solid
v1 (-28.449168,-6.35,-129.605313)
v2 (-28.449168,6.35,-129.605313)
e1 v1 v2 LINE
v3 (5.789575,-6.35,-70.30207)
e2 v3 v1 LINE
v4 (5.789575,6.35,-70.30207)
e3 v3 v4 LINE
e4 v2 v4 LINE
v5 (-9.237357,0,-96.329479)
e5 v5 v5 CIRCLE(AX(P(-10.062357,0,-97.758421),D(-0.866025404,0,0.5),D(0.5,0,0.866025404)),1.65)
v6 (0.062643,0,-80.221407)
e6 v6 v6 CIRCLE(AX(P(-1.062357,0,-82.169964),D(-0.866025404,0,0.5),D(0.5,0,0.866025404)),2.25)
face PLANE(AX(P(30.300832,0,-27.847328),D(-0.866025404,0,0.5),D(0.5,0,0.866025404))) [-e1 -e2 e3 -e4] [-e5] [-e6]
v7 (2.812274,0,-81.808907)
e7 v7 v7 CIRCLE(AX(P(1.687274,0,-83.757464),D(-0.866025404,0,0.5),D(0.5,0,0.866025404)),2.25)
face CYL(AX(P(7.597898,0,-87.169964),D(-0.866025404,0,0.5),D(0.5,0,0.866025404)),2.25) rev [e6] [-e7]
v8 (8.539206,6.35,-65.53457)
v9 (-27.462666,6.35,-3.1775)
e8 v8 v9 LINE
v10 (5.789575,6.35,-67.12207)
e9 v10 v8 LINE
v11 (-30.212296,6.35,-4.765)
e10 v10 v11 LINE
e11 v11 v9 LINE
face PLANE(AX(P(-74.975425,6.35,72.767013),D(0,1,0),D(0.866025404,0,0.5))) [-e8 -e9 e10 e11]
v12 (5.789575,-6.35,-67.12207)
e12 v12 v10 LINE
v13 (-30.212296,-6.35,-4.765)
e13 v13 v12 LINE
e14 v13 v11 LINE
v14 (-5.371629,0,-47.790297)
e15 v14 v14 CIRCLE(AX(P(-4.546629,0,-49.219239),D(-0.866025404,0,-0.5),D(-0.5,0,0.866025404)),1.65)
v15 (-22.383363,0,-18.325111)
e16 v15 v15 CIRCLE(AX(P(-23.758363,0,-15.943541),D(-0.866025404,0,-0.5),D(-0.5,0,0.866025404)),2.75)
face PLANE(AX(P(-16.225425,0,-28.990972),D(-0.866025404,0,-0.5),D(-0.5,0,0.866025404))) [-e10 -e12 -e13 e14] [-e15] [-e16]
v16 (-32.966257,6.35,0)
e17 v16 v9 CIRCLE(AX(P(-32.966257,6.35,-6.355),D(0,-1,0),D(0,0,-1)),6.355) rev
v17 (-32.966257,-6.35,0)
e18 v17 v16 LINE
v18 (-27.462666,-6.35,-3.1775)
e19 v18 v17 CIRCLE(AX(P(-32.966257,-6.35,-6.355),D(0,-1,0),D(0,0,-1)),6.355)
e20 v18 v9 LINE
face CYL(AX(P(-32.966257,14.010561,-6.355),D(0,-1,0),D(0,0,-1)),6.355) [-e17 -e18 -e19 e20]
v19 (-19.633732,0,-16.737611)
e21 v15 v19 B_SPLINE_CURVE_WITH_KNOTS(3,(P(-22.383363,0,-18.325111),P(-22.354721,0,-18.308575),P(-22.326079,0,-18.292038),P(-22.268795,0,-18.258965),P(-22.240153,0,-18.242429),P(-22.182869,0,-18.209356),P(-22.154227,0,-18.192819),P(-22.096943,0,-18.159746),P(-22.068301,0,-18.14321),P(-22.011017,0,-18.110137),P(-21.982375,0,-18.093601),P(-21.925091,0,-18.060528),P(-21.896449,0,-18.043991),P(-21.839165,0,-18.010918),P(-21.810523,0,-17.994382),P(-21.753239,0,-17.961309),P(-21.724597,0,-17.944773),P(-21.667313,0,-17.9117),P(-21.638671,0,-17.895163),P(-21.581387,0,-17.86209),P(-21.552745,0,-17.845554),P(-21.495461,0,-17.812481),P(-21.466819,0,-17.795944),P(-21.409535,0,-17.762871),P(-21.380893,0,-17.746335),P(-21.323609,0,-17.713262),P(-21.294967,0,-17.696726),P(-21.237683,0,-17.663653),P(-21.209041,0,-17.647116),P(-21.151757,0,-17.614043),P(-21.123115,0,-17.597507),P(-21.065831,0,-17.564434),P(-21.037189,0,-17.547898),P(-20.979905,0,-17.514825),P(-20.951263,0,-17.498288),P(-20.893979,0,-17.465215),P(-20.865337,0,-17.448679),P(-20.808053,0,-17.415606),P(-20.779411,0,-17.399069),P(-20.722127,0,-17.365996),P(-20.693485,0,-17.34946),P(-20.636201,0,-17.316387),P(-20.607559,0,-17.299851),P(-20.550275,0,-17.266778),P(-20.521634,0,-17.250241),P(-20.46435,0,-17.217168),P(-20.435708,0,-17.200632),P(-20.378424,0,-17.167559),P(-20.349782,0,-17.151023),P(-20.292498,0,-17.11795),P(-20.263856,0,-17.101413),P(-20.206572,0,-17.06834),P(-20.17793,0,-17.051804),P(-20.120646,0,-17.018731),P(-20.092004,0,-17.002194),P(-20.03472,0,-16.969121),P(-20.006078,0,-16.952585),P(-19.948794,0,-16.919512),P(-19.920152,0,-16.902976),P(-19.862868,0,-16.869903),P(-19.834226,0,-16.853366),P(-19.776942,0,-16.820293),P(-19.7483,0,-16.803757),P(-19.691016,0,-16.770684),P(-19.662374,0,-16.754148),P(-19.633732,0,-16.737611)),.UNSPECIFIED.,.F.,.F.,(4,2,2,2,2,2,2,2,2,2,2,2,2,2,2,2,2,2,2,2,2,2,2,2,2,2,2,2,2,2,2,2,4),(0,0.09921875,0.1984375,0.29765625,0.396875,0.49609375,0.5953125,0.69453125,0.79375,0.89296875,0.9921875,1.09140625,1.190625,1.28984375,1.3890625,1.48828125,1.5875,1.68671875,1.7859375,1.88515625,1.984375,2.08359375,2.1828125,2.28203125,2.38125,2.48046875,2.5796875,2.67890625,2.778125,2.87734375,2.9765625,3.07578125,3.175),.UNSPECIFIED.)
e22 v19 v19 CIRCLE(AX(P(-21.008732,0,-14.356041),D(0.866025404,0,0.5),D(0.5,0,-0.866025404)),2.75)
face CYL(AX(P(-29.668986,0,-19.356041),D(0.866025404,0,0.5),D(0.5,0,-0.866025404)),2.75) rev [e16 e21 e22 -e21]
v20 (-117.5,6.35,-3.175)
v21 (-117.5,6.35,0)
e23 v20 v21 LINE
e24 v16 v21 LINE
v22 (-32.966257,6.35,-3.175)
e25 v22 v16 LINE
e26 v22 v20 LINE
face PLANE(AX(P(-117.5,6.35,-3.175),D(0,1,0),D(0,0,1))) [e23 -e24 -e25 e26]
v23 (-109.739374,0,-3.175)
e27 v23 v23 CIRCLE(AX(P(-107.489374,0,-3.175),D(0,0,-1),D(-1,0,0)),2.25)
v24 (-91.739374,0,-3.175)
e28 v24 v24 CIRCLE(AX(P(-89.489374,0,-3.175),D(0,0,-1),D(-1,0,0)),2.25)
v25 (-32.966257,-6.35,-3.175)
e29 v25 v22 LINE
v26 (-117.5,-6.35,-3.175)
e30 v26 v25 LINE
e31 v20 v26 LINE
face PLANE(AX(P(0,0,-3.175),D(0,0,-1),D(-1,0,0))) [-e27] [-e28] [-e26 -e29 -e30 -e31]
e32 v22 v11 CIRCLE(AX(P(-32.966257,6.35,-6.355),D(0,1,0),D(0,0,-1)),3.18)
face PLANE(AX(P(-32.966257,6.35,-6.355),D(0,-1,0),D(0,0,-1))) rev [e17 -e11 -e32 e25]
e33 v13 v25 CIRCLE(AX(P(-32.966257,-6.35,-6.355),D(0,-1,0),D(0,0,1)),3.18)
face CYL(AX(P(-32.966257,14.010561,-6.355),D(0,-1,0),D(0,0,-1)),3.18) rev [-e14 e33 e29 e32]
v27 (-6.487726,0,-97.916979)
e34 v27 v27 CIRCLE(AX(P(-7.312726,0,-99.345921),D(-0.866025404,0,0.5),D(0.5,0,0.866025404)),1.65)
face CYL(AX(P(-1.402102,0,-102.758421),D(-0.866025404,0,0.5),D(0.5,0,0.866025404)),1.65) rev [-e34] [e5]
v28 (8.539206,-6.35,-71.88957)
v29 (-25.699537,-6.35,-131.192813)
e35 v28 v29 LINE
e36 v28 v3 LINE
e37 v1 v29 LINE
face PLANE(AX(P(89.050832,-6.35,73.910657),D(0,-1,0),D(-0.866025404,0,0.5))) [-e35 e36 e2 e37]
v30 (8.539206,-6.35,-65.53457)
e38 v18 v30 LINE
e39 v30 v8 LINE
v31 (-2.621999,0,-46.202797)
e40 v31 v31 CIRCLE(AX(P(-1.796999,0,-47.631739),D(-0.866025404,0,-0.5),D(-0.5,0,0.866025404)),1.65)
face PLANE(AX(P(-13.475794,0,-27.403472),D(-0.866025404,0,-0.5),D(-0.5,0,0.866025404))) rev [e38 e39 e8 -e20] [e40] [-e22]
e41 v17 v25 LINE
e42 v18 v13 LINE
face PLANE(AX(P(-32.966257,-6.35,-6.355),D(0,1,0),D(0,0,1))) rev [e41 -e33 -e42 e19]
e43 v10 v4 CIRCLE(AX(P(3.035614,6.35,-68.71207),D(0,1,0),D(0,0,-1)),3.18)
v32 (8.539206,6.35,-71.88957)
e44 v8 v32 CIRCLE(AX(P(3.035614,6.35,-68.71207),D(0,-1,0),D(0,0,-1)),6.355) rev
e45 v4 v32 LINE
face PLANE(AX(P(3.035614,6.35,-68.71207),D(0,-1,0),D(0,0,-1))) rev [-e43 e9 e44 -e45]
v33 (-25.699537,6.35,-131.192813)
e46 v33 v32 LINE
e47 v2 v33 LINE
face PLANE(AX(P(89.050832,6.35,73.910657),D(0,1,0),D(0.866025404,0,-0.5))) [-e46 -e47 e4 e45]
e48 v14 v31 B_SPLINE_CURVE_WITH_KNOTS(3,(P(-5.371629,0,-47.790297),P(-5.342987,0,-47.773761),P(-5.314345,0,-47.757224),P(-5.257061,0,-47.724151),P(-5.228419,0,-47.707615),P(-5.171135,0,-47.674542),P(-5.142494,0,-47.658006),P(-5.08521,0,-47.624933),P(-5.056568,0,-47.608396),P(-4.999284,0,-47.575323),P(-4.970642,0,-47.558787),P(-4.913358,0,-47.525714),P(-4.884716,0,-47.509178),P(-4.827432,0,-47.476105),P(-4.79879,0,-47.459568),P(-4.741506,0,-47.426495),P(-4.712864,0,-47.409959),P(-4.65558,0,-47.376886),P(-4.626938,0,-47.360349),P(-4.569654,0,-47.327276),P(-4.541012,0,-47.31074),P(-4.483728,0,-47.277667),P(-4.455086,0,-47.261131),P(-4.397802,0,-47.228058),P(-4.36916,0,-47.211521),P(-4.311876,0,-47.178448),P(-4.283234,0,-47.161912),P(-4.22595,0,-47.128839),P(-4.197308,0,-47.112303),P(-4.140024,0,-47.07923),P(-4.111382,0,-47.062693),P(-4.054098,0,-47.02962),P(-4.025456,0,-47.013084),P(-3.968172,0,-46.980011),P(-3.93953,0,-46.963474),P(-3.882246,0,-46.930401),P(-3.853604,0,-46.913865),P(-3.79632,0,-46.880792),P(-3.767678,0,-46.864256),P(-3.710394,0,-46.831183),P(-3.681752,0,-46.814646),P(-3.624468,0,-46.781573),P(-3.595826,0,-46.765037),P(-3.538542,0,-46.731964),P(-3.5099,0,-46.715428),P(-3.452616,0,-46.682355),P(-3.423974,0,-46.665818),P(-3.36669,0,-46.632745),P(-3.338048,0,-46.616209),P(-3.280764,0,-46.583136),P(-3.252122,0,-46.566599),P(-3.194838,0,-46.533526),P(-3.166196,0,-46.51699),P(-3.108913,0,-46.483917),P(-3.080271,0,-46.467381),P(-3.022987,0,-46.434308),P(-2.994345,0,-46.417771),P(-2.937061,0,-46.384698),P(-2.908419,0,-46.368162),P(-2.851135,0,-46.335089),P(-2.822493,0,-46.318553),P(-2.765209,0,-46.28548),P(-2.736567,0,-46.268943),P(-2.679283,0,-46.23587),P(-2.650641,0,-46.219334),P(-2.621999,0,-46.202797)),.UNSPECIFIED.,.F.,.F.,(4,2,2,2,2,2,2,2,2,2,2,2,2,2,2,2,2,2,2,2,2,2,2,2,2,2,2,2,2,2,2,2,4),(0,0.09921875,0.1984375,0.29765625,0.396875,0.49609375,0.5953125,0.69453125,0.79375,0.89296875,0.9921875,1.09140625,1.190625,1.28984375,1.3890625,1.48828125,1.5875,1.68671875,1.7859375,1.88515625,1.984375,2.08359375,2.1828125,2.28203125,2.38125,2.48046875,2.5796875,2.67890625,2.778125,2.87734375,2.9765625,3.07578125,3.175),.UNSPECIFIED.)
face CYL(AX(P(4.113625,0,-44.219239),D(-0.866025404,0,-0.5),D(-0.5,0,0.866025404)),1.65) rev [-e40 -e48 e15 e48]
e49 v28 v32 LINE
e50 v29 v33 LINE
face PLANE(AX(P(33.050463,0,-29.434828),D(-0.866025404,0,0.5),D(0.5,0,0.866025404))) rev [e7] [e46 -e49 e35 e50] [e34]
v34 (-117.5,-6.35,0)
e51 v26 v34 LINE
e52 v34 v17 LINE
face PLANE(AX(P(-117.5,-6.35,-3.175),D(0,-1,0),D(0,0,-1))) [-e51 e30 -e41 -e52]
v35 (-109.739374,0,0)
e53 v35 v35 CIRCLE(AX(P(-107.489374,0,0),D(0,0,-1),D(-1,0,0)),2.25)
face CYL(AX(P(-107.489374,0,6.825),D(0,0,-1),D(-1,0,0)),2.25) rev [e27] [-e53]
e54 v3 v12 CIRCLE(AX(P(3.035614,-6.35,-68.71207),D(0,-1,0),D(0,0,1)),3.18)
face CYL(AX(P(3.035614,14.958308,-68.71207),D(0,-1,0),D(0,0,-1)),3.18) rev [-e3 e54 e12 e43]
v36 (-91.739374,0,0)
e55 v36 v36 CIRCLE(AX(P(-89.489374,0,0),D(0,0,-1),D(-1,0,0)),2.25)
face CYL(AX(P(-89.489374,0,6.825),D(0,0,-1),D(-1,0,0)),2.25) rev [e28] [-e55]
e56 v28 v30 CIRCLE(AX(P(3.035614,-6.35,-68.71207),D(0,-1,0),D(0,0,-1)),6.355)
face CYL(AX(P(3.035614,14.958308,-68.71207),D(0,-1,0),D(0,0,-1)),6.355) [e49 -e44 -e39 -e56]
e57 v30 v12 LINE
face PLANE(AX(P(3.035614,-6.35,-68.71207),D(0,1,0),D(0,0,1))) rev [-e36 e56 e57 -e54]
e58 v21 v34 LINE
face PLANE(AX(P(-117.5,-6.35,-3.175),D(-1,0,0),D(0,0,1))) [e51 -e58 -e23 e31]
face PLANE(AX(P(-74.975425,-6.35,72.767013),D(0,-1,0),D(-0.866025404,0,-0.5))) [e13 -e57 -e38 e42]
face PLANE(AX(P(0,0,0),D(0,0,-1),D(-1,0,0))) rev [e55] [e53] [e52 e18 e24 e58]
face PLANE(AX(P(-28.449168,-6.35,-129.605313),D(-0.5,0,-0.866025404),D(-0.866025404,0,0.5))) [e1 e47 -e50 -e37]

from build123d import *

# Parameters (mm, degrees)
ESBO_O2_W               = 235
ESBO_O2_H               = 12.7
FLANGE_BASE1_DEPTH      = 3.175
DOBRA_START             = -6.35
DOBRA_ESBO_ADA1_DEPTH   = 12.7
DOBRA_ESBO_ADA1_2_DEPTH = 12.7
DOBRA_ESBO_ADA2_DEPTH   = 12.7
DOBRA_ESBO_ADA2_2_DEPTH = 12.7
ESBO_O11_R              = 2.250000001
CORTE_EXTRUS_O1_DEPTH   = 10
ESBO_O13_R              = 2.750000001
CORTE_EXTRUS_O3_DEPTH   = 10
ESBO_O16_R              = 2.25
CORTE_EXTRUS_O5_DEPTH   = 10
ESBO_O17_R              = 2.25
ESBO_O17_R_2            = 1.65
CORTE_EXTRUS_O6_DEPTH   = 10
ESBO_O18_R              = 1.650000002
CORTE_EXTRUS_O7_DEPTH   = 10


# Read off the part's stored shape, not the designer's step: Dobra esboçada1, Dobra esboçada2
# Sheet-metal steps are written as plain solids
with BuildPart() as part:
    # Esboço2 → Flange-base1 (new body)
    with BuildSketch(Plane.XY):
        Rectangle(ESBO_O2_W, ESBO_O2_H)
    extrude(amount=-FLANGE_BASE1_DEPTH)

    # Dobra esboçada1 outline → Dobra esboçada1 (cut)
    with BuildSketch(Plane(origin=(0, 0, 0), x_dir=(1, 0, 0), z_dir=(0, 1, 0)).offset(DOBRA_START)):
        with BuildLine():
            Line((117.5, 3.175), (-27.464109855, 3.175))
            ThreePointArc((-27.464109855, 3.175), (-29.790007409, 0.850686918), (-32.966257163, 0))
            Line((-32.966257163, 0), (117.5, 0))
            Line((117.5, 0), (117.5, 3.175))
        make_face()
    extrude(amount=DOBRA_ESBO_ADA1_DEPTH, mode=Mode.SUBTRACT)

    # Dobra esbo_ada1 2 outline → Dobra esbo_ada1 2 (add)
    with BuildSketch(Plane(origin=(0, 0, 0), x_dir=(1, 0, 0), z_dir=(0, 1, 0)).offset(DOBRA_START)):
        with BuildLine():
            Line((45.274205697, 129.161456881), (42.52457504, 130.748956881))
            Line((42.52457504, 130.748956881), (-30.212296379, 4.765))
            ThreePointArc((-30.212296379, 4.765), (-31.376257163, 3.601039216), (-32.966257163, 3.175))
            Line((-32.966257163, 3.175), (-27.464109855, 3.175))
            ThreePointArc((-27.464109855, 3.175), (-27.463387647, 3.176249918), (-27.462665722, 3.1775))
            Line((-27.462665722, 3.1775), (45.274205697, 129.161456881))
        make_face()
    extrude(amount=DOBRA_ESBO_ADA1_2_DEPTH)

    # Dobra esboçada2 outline → Dobra esboçada2 (cut)
    with BuildSketch(Plane(origin=(0, 0, 0), x_dir=(1, 0, 0), z_dir=(0, 1, 0)).offset(DOBRA_START)):
        with BuildLine():
            Line((42.52457504, 130.748956881), (8.540648694, 71.887069809))
            ThreePointArc((8.540648694, 71.887069809), (9.390614092, 68.7106269), (8.539205697, 65.534570465))
            Line((8.539205697, 65.534570465), (45.274205697, 129.161456881))
            Line((45.274205697, 129.161456881), (42.52457504, 130.748956881))
        make_face()
    extrude(amount=DOBRA_ESBO_ADA2_DEPTH, mode=Mode.SUBTRACT)

    # Dobra esbo_ada2 2 outline → Dobra esbo_ada2 2 (add)
    with BuildSketch(Plane(origin=(0, 0, 0), x_dir=(1, 0, 0), z_dir=(0, 1, 0)).offset(DOBRA_START)):
        with BuildLine():
            Line((-28.449167797, 129.605312646), (5.78957504, 70.302070465))
            ThreePointArc((5.78957504, 70.302070465), (6.215614256, 68.712070465), (5.78957504, 67.122070465))
            Line((5.78957504, 67.122070465), (8.540648694, 71.887069809))
            ThreePointArc((8.540648694, 71.887069809), (8.539927338, 71.888320219), (8.539205697, 71.889570465))
            Line((8.539205697, 71.889570465), (-25.69953714, 131.192812646))
            Line((-25.69953714, 131.192812646), (-28.449167797, 129.605312646))
        make_face()
    extrude(amount=DOBRA_ESBO_ADA2_2_DEPTH)

    # Esboço11 → Corte-extrusão1 (cut)
    with BuildSketch(Plane(origin=(0, 0, -3.175), x_dir=(-1, 0, 0), z_dir=(0, 0, -1))):
        with Locations((89.489373825, 0)):
            Circle(ESBO_O11_R)
    extrude(amount=-CORTE_EXTRUS_O1_DEPTH, mode=Mode.SUBTRACT)

    # Esboço13 → Corte-extrusão3 (cut)
    with BuildSketch(Plane(origin=(-21.972897151, 0, -12.686058085), x_dir=(0.49999999999999806, 0, -0.8660254037844398), z_dir=(0.8660254037844397, 0, 0.499999999999998))):
        with Locations((1.928330412, 0)):
            Circle(ESBO_O13_R)
    extrude(amount=-CORTE_EXTRUS_O3_DEPTH, mode=Mode.SUBTRACT)

    # Esboço16 → Corte-extrusão5 (cut)
    with BuildSketch(Plane(origin=(0, 0, -3.175), x_dir=(-1, 0, 0), z_dir=(0, 0, -1))):
        with Locations((107.489373825, 0)):
            Circle(ESBO_O16_R)
    extrude(amount=-CORTE_EXTRUS_O5_DEPTH, mode=Mode.SUBTRACT)

    # Esboço17 → Corte-extrusão6 (cut)
    with BuildSketch(Plane(origin=(34.783870761, 0, -20.082477147), x_dir=(0.5000000000000041, 0, 0.8660254037844364), z_dir=(-0.8660254037844363, 0, 0.500000000000004))):
        with Locations((-71.692454523, 0)):
            Circle(ESBO_O17_R)
        with Locations((-89.692454522, 0)):
            Circle(ESBO_O17_R_2)
    extrude(amount=-CORTE_EXTRUS_O6_DEPTH, mode=Mode.SUBTRACT)

    # Esboço18 → Corte-extrusão7 (cut)
    with BuildSketch(Plane(origin=(-24.722527808, 0, -14.273558085), x_dir=(-0.49999999999999806, 0, 0.8660254037844398), z_dir=(-0.8660254037844397, 0, -0.499999999999998))):
        with Locations((-40.351796828, 0)):
            Circle(ESBO_O18_R)
    extrude(amount=-CORTE_EXTRUS_O7_DEPTH, mode=Mode.SUBTRACT)


solid = part.part
